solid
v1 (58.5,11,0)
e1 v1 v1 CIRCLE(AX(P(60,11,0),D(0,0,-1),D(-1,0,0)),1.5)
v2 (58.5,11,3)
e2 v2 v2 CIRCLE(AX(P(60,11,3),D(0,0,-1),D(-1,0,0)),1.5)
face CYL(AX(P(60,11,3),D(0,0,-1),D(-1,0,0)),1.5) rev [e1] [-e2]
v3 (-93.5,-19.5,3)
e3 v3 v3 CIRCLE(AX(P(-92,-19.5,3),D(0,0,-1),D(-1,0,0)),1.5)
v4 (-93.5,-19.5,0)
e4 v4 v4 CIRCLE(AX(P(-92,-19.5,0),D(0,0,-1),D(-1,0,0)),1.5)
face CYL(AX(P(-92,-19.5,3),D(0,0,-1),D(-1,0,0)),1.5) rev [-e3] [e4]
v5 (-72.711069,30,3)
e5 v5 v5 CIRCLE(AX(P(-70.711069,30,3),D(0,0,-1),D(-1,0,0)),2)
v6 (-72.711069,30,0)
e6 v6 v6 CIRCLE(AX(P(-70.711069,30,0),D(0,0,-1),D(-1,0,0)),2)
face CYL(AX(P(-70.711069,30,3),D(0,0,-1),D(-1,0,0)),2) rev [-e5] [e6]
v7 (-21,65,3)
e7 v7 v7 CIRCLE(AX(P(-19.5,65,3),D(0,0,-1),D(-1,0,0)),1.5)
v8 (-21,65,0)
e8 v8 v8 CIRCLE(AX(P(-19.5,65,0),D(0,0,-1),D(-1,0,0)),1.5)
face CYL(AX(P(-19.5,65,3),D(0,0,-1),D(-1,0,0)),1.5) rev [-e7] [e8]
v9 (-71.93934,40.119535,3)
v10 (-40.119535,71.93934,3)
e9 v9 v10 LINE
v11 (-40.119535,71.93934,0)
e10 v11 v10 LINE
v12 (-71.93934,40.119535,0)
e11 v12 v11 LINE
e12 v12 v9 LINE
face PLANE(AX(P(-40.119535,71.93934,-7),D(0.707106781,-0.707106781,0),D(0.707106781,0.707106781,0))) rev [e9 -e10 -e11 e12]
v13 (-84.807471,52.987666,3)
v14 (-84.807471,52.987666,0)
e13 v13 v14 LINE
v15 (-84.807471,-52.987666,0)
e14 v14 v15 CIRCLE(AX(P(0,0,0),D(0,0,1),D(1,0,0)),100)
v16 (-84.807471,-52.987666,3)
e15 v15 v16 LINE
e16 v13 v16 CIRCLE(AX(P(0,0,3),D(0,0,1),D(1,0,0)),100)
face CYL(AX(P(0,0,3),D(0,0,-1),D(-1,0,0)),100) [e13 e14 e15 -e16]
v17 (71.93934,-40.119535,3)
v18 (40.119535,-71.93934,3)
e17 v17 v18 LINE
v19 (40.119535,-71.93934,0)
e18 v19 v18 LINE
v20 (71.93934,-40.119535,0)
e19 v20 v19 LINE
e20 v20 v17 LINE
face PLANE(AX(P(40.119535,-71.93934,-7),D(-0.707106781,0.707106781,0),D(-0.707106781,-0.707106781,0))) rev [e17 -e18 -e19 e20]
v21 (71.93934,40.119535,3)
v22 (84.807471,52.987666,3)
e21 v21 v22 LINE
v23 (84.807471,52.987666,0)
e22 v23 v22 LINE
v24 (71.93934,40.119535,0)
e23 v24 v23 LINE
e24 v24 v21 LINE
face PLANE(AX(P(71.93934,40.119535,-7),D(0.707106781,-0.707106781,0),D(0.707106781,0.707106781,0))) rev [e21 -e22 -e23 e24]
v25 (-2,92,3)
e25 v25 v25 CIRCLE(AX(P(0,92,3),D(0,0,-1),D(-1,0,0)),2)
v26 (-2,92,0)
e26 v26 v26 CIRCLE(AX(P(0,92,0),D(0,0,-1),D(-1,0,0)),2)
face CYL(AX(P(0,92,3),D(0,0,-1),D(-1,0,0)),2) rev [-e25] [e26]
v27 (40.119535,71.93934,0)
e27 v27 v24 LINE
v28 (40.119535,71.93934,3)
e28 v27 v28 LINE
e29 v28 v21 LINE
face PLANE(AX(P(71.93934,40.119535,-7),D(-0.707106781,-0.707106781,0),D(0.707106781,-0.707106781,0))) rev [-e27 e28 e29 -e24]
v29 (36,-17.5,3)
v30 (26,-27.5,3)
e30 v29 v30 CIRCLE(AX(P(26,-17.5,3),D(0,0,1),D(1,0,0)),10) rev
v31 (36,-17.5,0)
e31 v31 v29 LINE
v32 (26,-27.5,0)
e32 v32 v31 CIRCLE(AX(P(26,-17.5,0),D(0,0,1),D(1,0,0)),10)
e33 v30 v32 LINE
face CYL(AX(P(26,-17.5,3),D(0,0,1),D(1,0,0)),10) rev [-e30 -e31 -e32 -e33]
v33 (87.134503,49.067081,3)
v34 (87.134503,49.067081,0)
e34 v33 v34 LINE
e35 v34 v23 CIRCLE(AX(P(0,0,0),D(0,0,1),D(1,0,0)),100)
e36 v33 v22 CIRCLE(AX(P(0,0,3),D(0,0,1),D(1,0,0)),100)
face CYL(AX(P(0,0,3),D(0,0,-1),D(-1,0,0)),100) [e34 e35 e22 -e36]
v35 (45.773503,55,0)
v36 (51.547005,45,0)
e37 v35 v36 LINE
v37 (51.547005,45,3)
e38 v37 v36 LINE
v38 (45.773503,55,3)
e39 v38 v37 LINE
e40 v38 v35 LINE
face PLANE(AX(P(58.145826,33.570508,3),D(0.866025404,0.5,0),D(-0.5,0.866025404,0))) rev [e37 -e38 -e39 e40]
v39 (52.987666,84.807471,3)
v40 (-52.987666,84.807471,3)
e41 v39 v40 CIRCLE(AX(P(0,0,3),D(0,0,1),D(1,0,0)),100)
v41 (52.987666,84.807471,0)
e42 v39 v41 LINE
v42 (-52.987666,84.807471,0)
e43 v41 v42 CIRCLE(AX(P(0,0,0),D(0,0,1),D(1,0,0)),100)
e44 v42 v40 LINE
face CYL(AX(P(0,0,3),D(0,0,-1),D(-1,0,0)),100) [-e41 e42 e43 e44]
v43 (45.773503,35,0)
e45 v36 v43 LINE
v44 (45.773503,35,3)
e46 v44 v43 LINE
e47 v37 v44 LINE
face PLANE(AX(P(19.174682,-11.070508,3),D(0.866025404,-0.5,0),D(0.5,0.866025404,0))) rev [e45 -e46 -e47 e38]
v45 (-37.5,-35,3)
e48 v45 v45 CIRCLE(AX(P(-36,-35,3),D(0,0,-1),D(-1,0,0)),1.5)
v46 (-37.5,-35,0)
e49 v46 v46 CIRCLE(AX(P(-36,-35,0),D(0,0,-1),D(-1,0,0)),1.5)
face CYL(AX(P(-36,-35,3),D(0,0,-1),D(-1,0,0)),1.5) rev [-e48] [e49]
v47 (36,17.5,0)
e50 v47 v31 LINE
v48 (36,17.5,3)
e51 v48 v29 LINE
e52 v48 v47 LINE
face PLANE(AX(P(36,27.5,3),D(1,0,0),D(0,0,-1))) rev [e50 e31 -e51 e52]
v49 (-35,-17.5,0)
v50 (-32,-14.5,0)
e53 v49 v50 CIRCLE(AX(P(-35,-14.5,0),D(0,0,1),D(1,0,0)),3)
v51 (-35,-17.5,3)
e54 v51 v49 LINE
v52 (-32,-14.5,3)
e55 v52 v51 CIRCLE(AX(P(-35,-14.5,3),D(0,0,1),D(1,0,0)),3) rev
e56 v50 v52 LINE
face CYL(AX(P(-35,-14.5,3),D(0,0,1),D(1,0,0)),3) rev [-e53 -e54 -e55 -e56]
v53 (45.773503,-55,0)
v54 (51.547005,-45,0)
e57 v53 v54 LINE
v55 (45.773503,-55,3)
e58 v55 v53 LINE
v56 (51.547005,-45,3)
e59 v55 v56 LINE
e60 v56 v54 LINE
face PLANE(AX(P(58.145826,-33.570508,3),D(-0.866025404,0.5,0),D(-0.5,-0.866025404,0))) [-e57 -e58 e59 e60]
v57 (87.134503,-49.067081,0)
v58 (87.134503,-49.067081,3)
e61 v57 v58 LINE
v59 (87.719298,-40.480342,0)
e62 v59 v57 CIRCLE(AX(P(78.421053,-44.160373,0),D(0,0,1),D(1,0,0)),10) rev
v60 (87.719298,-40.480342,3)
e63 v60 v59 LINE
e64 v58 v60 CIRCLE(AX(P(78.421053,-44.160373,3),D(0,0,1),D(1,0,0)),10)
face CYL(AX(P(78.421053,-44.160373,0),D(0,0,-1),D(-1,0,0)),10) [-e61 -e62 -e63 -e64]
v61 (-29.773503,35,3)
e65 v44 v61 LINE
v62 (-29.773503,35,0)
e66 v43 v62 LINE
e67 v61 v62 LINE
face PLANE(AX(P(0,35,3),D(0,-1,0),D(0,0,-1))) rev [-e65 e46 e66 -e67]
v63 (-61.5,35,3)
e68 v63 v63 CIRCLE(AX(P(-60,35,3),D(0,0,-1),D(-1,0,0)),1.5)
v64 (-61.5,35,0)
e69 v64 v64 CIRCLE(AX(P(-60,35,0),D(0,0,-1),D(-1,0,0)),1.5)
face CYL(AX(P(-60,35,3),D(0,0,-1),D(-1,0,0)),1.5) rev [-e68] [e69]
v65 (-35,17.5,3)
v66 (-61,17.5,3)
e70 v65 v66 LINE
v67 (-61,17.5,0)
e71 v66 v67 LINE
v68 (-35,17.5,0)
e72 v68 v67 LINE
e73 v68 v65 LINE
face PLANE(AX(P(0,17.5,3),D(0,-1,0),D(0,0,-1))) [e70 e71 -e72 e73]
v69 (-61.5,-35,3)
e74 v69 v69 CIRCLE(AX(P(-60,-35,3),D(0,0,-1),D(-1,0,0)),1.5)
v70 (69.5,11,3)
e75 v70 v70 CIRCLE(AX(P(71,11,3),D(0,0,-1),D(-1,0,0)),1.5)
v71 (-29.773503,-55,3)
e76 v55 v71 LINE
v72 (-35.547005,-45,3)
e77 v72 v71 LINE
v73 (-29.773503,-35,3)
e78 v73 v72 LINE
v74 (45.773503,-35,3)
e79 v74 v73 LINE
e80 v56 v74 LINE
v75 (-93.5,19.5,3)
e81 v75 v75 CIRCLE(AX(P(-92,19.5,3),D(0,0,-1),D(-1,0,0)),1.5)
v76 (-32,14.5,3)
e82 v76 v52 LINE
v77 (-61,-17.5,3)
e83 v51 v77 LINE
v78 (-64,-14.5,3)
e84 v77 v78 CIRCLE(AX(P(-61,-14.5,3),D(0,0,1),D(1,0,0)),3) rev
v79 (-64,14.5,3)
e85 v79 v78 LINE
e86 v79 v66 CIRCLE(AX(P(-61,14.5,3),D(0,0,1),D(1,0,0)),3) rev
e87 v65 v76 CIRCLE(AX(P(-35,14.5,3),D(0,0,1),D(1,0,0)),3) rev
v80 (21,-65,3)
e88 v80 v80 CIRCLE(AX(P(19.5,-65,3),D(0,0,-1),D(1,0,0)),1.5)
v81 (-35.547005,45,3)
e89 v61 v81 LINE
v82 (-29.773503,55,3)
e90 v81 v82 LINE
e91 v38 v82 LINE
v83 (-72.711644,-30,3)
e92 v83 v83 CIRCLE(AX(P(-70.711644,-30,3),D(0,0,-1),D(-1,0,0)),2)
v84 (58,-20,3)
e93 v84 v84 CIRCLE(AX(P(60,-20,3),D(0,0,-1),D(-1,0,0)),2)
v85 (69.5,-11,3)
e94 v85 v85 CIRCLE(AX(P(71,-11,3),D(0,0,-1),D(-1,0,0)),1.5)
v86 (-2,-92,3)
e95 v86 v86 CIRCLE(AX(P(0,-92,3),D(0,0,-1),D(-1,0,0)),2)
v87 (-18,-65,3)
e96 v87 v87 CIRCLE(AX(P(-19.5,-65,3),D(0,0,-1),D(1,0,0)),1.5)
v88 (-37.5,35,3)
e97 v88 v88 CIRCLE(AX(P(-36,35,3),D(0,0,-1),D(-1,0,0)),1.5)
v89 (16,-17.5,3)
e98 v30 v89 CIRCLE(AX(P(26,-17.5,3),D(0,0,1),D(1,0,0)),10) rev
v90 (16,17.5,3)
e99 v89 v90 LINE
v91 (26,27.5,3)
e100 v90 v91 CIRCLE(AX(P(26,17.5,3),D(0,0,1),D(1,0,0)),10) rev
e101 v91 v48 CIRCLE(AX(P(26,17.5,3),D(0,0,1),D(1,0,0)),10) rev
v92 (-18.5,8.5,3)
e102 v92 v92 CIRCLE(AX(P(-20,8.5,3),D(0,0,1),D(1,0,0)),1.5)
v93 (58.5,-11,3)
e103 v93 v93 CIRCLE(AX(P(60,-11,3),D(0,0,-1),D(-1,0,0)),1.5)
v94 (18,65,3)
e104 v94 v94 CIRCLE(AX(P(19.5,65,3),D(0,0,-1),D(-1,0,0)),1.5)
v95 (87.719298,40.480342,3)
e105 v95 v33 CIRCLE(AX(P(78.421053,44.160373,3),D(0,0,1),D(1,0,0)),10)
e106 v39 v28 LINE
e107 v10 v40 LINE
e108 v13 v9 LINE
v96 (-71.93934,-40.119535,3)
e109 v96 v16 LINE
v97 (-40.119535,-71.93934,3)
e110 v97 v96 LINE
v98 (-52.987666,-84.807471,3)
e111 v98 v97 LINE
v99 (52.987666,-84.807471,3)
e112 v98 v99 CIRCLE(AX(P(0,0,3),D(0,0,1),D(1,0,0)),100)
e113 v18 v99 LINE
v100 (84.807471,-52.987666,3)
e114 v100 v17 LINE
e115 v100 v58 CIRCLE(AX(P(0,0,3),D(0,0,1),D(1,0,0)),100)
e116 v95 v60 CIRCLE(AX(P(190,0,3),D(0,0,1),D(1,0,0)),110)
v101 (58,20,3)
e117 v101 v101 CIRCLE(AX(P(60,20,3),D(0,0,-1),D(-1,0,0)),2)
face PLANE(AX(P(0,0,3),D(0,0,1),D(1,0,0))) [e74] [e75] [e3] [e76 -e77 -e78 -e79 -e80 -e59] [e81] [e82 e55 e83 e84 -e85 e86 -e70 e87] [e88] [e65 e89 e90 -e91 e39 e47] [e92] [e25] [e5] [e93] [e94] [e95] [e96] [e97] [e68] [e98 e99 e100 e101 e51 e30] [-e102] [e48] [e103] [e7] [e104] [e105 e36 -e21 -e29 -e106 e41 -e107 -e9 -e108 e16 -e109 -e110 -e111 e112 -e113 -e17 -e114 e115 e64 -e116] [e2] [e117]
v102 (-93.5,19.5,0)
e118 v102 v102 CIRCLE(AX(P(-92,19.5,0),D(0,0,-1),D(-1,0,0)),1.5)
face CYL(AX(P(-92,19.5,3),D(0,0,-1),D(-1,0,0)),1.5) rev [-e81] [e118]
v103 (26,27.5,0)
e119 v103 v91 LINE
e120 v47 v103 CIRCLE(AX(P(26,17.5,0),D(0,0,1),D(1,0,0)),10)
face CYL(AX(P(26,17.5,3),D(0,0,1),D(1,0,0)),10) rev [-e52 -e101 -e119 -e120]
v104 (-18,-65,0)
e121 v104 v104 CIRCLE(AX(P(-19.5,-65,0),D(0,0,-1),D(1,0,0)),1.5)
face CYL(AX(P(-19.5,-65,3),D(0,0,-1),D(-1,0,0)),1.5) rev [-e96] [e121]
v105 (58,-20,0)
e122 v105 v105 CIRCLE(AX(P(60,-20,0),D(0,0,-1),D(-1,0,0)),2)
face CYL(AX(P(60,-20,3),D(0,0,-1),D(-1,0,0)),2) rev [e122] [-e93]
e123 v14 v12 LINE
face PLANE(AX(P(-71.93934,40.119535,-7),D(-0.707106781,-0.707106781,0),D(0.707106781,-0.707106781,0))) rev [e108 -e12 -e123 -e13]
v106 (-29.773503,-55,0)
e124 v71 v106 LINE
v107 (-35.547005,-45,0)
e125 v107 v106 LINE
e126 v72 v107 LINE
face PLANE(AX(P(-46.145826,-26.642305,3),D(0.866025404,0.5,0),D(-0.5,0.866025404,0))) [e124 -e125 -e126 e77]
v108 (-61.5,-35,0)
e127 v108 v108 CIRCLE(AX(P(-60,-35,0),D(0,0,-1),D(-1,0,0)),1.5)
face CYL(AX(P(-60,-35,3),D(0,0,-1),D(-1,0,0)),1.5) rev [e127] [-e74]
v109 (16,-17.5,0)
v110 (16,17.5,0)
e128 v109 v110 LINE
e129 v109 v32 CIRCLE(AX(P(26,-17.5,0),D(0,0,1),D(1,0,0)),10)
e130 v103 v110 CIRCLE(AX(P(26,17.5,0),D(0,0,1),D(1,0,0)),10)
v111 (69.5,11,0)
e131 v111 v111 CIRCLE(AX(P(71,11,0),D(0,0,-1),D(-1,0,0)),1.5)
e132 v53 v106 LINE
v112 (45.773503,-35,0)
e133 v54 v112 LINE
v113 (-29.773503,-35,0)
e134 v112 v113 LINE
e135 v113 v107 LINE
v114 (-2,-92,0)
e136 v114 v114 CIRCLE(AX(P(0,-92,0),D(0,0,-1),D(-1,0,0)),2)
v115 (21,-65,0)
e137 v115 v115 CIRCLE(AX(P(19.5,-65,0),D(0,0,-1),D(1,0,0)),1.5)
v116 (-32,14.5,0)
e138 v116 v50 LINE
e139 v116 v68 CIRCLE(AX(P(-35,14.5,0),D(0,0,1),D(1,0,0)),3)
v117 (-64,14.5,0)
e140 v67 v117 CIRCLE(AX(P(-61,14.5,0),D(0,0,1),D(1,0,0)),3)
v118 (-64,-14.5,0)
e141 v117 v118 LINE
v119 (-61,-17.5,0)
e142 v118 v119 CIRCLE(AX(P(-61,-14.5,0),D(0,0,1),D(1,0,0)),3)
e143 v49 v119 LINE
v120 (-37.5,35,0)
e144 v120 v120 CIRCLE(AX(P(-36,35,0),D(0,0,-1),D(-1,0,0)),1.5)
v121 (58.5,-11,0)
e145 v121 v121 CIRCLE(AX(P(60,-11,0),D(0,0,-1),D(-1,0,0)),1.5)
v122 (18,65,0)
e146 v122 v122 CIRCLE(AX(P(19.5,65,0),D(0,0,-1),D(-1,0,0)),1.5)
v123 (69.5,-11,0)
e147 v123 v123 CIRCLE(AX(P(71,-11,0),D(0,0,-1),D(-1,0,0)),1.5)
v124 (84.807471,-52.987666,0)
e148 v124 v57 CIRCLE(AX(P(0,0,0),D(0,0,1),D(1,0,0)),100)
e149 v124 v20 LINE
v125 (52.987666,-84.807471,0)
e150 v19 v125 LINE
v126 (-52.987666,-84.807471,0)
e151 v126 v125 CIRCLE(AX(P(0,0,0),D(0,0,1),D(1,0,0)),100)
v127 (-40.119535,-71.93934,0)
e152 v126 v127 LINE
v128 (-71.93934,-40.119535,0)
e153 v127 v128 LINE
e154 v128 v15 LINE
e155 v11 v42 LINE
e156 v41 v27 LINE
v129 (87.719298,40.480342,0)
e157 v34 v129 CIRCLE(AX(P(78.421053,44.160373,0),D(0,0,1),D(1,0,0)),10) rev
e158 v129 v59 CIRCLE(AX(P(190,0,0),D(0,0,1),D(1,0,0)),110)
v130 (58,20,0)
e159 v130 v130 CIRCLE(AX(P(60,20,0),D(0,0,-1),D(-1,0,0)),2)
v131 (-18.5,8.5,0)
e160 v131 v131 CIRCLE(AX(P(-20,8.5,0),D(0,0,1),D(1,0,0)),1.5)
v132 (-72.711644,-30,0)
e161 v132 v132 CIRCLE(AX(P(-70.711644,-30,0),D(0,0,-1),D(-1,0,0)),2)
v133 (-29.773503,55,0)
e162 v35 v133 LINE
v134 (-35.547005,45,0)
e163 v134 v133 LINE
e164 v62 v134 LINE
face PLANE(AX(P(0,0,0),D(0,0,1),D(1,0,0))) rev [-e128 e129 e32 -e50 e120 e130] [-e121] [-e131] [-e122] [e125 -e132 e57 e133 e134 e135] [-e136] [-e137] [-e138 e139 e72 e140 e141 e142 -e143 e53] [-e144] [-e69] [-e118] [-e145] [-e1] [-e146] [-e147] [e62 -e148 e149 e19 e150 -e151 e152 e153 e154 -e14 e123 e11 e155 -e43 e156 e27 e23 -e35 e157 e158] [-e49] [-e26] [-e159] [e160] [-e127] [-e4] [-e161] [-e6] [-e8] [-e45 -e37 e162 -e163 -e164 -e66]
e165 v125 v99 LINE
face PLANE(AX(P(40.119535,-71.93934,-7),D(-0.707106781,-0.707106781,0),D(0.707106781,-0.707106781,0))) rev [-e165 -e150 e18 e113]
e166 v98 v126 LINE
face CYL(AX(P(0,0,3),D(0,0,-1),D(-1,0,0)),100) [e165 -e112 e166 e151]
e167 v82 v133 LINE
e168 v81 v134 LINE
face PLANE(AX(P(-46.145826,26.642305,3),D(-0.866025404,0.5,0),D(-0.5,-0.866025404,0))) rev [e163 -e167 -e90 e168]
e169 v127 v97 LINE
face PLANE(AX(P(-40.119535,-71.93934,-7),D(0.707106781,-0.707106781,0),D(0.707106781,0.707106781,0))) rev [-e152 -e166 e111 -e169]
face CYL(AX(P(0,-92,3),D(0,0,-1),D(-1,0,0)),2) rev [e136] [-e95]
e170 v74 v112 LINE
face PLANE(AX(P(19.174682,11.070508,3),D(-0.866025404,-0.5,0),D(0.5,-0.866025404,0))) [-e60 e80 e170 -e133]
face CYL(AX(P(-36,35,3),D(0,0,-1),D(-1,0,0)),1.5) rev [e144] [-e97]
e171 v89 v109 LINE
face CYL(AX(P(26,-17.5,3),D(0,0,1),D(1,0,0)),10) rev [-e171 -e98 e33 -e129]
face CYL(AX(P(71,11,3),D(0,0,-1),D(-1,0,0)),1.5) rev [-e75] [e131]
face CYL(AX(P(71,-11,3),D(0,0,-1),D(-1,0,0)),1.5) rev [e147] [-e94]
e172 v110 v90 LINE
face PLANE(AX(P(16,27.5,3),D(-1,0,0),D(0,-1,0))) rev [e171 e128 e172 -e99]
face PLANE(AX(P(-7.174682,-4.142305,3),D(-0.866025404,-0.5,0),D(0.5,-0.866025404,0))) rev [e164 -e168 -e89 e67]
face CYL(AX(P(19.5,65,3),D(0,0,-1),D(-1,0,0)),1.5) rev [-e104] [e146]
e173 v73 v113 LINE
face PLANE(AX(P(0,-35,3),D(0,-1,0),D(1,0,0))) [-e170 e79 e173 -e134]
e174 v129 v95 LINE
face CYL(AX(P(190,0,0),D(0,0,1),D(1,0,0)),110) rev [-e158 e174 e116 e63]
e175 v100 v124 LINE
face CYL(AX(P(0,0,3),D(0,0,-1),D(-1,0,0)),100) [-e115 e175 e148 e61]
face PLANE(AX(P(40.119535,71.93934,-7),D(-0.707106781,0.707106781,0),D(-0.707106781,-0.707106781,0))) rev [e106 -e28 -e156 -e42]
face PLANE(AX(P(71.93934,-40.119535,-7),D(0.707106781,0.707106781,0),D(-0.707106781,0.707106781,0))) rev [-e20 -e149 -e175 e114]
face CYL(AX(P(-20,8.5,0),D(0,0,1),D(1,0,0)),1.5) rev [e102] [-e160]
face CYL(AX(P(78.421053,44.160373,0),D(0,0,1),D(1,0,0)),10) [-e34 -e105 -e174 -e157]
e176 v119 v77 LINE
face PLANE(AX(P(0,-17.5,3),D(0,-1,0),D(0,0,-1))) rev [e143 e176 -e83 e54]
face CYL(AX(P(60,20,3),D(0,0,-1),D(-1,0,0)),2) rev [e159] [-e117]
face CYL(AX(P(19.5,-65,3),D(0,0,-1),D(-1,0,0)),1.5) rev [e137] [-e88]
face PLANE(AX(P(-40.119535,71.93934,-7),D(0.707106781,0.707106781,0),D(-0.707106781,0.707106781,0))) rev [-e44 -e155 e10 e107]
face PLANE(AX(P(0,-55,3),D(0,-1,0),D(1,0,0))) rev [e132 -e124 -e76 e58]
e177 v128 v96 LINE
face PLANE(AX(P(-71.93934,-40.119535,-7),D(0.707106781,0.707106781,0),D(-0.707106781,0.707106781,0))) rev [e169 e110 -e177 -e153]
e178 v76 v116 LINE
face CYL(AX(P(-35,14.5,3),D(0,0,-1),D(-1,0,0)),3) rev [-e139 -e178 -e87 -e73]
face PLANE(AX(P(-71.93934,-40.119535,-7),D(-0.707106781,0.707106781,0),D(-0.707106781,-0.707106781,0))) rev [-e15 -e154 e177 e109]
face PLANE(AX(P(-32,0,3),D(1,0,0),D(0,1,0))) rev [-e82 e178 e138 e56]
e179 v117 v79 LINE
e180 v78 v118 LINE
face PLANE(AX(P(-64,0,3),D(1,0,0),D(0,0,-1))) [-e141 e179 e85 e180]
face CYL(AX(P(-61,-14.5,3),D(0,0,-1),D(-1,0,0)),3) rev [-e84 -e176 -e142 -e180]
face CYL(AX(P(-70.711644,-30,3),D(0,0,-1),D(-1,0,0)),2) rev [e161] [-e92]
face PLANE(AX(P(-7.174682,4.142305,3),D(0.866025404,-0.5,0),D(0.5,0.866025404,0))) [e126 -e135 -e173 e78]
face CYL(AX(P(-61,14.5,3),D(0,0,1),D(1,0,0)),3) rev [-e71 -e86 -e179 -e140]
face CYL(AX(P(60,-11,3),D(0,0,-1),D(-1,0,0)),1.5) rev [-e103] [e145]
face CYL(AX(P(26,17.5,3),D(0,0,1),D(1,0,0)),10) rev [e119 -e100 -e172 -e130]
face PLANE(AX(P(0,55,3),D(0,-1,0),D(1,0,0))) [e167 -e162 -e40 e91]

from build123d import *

# Parameters (mm, degrees)
CROQUIS1_R              = 100
SALIENTE_EXTRUIR1_DEPTH = 3
CROQUIS3_R              = 110
CORTAR_EXTRUIR1_DEPTH   = 3
REDONDEO1_R             = 10
CORTAR_EXTRUIR3_DEPTH   = 10
CROQUIS10_R             = 1.5
CORTAR_EXTRUIR4_DEPTH   = 142.453172607
CROQUIS12_R             = 1.5
CORTAR_EXTRUIR6_DEPTH   = 142.453172607
CROQUIS13_R             = 2
CORTAR_EXTRUIR7_DEPTH   = 142.453172607
CROQUIS15_W             = 32
CROQUIS15_H             = 35
CORTAR_EXTRUIR8_DEPTH   = 142.453172607
REDONDEO2_R             = 3
CROQUIS16_R             = 1.5
CORTAR_EXTRUIR9_DEPTH   = 142.453172607
CROQUIS17_W             = 20
CROQUIS17_H             = 55
CORTAR_EXTRUIR10_DEPTH  = 142.453172607
REDONDEO3_R             = 10


with BuildPart() as part:
    # Croquis1 → Saliente-Extruir1 (new body)
    with BuildSketch(Plane.XY):
        Circle(CROQUIS1_R)
    extrude(amount=SALIENTE_EXTRUIR1_DEPTH)

    # Croquis3 → Cortar-Extruir1 (cut)
    with BuildSketch(Plane.XY.offset(3)):
        with Locations((190, 0)):
            Circle(CROQUIS3_R)
    extrude(amount=-CORTAR_EXTRUIR1_DEPTH, mode=Mode.SUBTRACT)

    # Redondeo1
    redondeo1_edges = [part.edges().sort_by_distance(p)[0] for p in [
        (89.473684211, -44.659375654, 1.5),
        (89.473684211, 44.659375654, 1.5),
    ]]
    fillet(redondeo1_edges, radius=REDONDEO1_R)

    # Croquis7 → Cortar-Extruir3 (cut)
    with BuildSketch(Plane.XY.offset(3)):
        Polygon((-71.939339828, -40.119534675), (-40.119534675, -71.939339828), (-57.797204204, -89.617009358), (-89.617009358, -57.797204204), align=None)
        Polygon((-40.119534675, 71.939339828), (-71.939339828, 40.119534675), (-89.617009358, 57.797204204), (-57.797204204, 89.617009358), align=None)
        Polygon((71.939339828, 40.119534675), (40.119534675, 71.939339828), (57.797204204, 89.617009358), (89.617009358, 57.797204204), align=None)
        Polygon((40.119534675, -71.939339828), (71.939339828, -40.119534675), (89.617009358, -57.797204204), (57.797204204, -89.617009358), align=None)
    extrude(amount=-CORTAR_EXTRUIR3_DEPTH, mode=Mode.SUBTRACT)

    # Croquis10 → Cortar-Extruir4 (cut, through all)
    with BuildSketch(Plane.XY.offset(3)):
        with Locations((-20, 8.5)):
            Circle(CROQUIS10_R)
    extrude(amount=-CORTAR_EXTRUIR4_DEPTH, mode=Mode.SUBTRACT)

    # Croquis12 → Cortar-Extruir6 (cut, through all)
    with BuildSketch(Plane(origin=(0, 0, 0), x_dir=(-1, 0, 0), z_dir=(0, 0, -1))):
        with Locations((-71, 11)):
            Circle(CROQUIS12_R)
        with Locations((-71, -11)):
            Circle(CROQUIS12_R)
        with Locations((-60, 11)):
            Circle(CROQUIS12_R)
        with Locations((-60, -11)):
            Circle(CROQUIS12_R)
    extrude(amount=-CORTAR_EXTRUIR6_DEPTH, mode=Mode.SUBTRACT)

    # Croquis13 → Cortar-Extruir7 (cut, through all)
    with BuildSketch(Plane(origin=(0, 0, 0), x_dir=(-1, 0, 0), z_dir=(0, 0, -1))):
        with Locations((0, 92)):
            Circle(CROQUIS13_R)
        with Locations((0, -92)):
            Circle(CROQUIS13_R)
        with Locations((70.711068531, 30)):
            Circle(CROQUIS13_R)
        with Locations((70.711643931, -30)):
            Circle(CROQUIS13_R)
        with Locations((-60, 20)):
            Circle(CROQUIS13_R)
        with Locations((-60, -20)):
            Circle(CROQUIS13_R)
    extrude(amount=-CORTAR_EXTRUIR7_DEPTH, mode=Mode.SUBTRACT)

    # Croquis15 → Cortar-Extruir8 (cut, through all)
    with BuildSketch(Plane(origin=(0, 0, 0), x_dir=(-1, 0, 0), z_dir=(0, 0, -1))):
        Polygon((18.226497308, 55), (-34.226497308, 55), (-28.452994616, 45), (-34.226497308, 35), (18.226497308, 35), (12.452994616, 45), align=None)
        Polygon((-34.226497308, 55), (-40, 55), (-40, 35), (-34.226497308, 35), (-28.452994616, 45), align=None)
        Polygon((-40, 35), (-40, 55), (-45.773502692, 55), (-51.547005384, 45), (-45.773502692, 35), align=None)
        Polygon((29.773502692, 55), (24, 55), (24, 35), (29.773502692, 35), (35.547005384, 45), align=None)
        Polygon((24, 55), (18.226497308, 55), (12.452994616, 45), (18.226497308, 35), (24, 35), align=None)
        Polygon((12.452994616, -45), (18.226497308, -35), (-34.226497308, -35), (-28.452994616, -45), (-34.226497308, -55), (18.226497308, -55), align=None)
        Polygon((24, -55), (24, -35), (18.226497308, -35), (12.452994616, -45), (18.226497308, -55), align=None)
        Polygon((35.547005384, -45), (29.773502692, -35), (24, -35), (24, -55), (29.773502692, -55), align=None)
        Polygon((-28.452994616, -45), (-34.226497308, -35), (-40, -35), (-40, -55), (-34.226497308, -55), align=None)
        Polygon((-40, -55), (-40, -35), (-45.773502692, -35), (-51.547005384, -45), (-45.773502692, -55), align=None)
        with Locations((48, 0)):
            Rectangle(CROQUIS15_W, CROQUIS15_H)
    extrude(amount=-CORTAR_EXTRUIR8_DEPTH, mode=Mode.SUBTRACT)

    # Redondeo2
    redondeo2_edges = [part.edges().sort_by_distance(p)[0] for p in [
        (-64, 17.5, 1.5),
        (-32, 17.5, 1.5),
        (-32, -17.5, 1.5),
        (-64, -17.5, 1.5),
    ]]
    fillet(redondeo2_edges, radius=REDONDEO2_R)

    # Croquis16 → Cortar-Extruir9 (cut, through all)
    with BuildSketch(Plane(origin=(0, 0, 0), x_dir=(-1, 0, 0), z_dir=(0, 0, -1))):
        with Locations((-19.5, 65)):
            Circle(CROQUIS16_R)
        with Locations((19.5, 65)):
            Circle(CROQUIS16_R)
        with Locations(Location((19.5, -65, 0), (0, 0, 180))):
            Circle(CROQUIS16_R)
        with Locations(Location((-19.5, -65, 0), (0, 0, 180))):
            Circle(CROQUIS16_R)
        with Locations((36, 35)):
            Circle(CROQUIS16_R)
        with Locations((36, -35)):
            Circle(CROQUIS16_R)
        with Locations((60, -35)):
            Circle(CROQUIS16_R)
        with Locations((60, 35)):
            Circle(CROQUIS16_R)
        with Locations((92, 19.5)):
            Circle(CROQUIS16_R)
        with Locations((92, -19.5)):
            Circle(CROQUIS16_R)
    extrude(amount=-CORTAR_EXTRUIR9_DEPTH, mode=Mode.SUBTRACT)

    # Croquis17 → Cortar-Extruir10 (cut, through all)
    with BuildSketch(Plane(origin=(0, 0, 0), x_dir=(-1, 0, 0), z_dir=(0, 0, -1))):
        with Locations((-26, 0)):
            Rectangle(CROQUIS17_W, CROQUIS17_H)
    extrude(amount=-CORTAR_EXTRUIR10_DEPTH, mode=Mode.SUBTRACT)

    # Redondeo3
    redondeo3_edges = [part.edges().sort_by_distance(p)[0] for p in [
        (16, -27.5, 1.5),
        (36, -27.5, 1.5),
        (16, 27.5, 1.5),
        (36, 27.5, 1.5),
    ]]
    fillet(redondeo3_edges, radius=REDONDEO3_R - 0.0001)  # a hair under: the kernel refuses the full size


solid = part.part
